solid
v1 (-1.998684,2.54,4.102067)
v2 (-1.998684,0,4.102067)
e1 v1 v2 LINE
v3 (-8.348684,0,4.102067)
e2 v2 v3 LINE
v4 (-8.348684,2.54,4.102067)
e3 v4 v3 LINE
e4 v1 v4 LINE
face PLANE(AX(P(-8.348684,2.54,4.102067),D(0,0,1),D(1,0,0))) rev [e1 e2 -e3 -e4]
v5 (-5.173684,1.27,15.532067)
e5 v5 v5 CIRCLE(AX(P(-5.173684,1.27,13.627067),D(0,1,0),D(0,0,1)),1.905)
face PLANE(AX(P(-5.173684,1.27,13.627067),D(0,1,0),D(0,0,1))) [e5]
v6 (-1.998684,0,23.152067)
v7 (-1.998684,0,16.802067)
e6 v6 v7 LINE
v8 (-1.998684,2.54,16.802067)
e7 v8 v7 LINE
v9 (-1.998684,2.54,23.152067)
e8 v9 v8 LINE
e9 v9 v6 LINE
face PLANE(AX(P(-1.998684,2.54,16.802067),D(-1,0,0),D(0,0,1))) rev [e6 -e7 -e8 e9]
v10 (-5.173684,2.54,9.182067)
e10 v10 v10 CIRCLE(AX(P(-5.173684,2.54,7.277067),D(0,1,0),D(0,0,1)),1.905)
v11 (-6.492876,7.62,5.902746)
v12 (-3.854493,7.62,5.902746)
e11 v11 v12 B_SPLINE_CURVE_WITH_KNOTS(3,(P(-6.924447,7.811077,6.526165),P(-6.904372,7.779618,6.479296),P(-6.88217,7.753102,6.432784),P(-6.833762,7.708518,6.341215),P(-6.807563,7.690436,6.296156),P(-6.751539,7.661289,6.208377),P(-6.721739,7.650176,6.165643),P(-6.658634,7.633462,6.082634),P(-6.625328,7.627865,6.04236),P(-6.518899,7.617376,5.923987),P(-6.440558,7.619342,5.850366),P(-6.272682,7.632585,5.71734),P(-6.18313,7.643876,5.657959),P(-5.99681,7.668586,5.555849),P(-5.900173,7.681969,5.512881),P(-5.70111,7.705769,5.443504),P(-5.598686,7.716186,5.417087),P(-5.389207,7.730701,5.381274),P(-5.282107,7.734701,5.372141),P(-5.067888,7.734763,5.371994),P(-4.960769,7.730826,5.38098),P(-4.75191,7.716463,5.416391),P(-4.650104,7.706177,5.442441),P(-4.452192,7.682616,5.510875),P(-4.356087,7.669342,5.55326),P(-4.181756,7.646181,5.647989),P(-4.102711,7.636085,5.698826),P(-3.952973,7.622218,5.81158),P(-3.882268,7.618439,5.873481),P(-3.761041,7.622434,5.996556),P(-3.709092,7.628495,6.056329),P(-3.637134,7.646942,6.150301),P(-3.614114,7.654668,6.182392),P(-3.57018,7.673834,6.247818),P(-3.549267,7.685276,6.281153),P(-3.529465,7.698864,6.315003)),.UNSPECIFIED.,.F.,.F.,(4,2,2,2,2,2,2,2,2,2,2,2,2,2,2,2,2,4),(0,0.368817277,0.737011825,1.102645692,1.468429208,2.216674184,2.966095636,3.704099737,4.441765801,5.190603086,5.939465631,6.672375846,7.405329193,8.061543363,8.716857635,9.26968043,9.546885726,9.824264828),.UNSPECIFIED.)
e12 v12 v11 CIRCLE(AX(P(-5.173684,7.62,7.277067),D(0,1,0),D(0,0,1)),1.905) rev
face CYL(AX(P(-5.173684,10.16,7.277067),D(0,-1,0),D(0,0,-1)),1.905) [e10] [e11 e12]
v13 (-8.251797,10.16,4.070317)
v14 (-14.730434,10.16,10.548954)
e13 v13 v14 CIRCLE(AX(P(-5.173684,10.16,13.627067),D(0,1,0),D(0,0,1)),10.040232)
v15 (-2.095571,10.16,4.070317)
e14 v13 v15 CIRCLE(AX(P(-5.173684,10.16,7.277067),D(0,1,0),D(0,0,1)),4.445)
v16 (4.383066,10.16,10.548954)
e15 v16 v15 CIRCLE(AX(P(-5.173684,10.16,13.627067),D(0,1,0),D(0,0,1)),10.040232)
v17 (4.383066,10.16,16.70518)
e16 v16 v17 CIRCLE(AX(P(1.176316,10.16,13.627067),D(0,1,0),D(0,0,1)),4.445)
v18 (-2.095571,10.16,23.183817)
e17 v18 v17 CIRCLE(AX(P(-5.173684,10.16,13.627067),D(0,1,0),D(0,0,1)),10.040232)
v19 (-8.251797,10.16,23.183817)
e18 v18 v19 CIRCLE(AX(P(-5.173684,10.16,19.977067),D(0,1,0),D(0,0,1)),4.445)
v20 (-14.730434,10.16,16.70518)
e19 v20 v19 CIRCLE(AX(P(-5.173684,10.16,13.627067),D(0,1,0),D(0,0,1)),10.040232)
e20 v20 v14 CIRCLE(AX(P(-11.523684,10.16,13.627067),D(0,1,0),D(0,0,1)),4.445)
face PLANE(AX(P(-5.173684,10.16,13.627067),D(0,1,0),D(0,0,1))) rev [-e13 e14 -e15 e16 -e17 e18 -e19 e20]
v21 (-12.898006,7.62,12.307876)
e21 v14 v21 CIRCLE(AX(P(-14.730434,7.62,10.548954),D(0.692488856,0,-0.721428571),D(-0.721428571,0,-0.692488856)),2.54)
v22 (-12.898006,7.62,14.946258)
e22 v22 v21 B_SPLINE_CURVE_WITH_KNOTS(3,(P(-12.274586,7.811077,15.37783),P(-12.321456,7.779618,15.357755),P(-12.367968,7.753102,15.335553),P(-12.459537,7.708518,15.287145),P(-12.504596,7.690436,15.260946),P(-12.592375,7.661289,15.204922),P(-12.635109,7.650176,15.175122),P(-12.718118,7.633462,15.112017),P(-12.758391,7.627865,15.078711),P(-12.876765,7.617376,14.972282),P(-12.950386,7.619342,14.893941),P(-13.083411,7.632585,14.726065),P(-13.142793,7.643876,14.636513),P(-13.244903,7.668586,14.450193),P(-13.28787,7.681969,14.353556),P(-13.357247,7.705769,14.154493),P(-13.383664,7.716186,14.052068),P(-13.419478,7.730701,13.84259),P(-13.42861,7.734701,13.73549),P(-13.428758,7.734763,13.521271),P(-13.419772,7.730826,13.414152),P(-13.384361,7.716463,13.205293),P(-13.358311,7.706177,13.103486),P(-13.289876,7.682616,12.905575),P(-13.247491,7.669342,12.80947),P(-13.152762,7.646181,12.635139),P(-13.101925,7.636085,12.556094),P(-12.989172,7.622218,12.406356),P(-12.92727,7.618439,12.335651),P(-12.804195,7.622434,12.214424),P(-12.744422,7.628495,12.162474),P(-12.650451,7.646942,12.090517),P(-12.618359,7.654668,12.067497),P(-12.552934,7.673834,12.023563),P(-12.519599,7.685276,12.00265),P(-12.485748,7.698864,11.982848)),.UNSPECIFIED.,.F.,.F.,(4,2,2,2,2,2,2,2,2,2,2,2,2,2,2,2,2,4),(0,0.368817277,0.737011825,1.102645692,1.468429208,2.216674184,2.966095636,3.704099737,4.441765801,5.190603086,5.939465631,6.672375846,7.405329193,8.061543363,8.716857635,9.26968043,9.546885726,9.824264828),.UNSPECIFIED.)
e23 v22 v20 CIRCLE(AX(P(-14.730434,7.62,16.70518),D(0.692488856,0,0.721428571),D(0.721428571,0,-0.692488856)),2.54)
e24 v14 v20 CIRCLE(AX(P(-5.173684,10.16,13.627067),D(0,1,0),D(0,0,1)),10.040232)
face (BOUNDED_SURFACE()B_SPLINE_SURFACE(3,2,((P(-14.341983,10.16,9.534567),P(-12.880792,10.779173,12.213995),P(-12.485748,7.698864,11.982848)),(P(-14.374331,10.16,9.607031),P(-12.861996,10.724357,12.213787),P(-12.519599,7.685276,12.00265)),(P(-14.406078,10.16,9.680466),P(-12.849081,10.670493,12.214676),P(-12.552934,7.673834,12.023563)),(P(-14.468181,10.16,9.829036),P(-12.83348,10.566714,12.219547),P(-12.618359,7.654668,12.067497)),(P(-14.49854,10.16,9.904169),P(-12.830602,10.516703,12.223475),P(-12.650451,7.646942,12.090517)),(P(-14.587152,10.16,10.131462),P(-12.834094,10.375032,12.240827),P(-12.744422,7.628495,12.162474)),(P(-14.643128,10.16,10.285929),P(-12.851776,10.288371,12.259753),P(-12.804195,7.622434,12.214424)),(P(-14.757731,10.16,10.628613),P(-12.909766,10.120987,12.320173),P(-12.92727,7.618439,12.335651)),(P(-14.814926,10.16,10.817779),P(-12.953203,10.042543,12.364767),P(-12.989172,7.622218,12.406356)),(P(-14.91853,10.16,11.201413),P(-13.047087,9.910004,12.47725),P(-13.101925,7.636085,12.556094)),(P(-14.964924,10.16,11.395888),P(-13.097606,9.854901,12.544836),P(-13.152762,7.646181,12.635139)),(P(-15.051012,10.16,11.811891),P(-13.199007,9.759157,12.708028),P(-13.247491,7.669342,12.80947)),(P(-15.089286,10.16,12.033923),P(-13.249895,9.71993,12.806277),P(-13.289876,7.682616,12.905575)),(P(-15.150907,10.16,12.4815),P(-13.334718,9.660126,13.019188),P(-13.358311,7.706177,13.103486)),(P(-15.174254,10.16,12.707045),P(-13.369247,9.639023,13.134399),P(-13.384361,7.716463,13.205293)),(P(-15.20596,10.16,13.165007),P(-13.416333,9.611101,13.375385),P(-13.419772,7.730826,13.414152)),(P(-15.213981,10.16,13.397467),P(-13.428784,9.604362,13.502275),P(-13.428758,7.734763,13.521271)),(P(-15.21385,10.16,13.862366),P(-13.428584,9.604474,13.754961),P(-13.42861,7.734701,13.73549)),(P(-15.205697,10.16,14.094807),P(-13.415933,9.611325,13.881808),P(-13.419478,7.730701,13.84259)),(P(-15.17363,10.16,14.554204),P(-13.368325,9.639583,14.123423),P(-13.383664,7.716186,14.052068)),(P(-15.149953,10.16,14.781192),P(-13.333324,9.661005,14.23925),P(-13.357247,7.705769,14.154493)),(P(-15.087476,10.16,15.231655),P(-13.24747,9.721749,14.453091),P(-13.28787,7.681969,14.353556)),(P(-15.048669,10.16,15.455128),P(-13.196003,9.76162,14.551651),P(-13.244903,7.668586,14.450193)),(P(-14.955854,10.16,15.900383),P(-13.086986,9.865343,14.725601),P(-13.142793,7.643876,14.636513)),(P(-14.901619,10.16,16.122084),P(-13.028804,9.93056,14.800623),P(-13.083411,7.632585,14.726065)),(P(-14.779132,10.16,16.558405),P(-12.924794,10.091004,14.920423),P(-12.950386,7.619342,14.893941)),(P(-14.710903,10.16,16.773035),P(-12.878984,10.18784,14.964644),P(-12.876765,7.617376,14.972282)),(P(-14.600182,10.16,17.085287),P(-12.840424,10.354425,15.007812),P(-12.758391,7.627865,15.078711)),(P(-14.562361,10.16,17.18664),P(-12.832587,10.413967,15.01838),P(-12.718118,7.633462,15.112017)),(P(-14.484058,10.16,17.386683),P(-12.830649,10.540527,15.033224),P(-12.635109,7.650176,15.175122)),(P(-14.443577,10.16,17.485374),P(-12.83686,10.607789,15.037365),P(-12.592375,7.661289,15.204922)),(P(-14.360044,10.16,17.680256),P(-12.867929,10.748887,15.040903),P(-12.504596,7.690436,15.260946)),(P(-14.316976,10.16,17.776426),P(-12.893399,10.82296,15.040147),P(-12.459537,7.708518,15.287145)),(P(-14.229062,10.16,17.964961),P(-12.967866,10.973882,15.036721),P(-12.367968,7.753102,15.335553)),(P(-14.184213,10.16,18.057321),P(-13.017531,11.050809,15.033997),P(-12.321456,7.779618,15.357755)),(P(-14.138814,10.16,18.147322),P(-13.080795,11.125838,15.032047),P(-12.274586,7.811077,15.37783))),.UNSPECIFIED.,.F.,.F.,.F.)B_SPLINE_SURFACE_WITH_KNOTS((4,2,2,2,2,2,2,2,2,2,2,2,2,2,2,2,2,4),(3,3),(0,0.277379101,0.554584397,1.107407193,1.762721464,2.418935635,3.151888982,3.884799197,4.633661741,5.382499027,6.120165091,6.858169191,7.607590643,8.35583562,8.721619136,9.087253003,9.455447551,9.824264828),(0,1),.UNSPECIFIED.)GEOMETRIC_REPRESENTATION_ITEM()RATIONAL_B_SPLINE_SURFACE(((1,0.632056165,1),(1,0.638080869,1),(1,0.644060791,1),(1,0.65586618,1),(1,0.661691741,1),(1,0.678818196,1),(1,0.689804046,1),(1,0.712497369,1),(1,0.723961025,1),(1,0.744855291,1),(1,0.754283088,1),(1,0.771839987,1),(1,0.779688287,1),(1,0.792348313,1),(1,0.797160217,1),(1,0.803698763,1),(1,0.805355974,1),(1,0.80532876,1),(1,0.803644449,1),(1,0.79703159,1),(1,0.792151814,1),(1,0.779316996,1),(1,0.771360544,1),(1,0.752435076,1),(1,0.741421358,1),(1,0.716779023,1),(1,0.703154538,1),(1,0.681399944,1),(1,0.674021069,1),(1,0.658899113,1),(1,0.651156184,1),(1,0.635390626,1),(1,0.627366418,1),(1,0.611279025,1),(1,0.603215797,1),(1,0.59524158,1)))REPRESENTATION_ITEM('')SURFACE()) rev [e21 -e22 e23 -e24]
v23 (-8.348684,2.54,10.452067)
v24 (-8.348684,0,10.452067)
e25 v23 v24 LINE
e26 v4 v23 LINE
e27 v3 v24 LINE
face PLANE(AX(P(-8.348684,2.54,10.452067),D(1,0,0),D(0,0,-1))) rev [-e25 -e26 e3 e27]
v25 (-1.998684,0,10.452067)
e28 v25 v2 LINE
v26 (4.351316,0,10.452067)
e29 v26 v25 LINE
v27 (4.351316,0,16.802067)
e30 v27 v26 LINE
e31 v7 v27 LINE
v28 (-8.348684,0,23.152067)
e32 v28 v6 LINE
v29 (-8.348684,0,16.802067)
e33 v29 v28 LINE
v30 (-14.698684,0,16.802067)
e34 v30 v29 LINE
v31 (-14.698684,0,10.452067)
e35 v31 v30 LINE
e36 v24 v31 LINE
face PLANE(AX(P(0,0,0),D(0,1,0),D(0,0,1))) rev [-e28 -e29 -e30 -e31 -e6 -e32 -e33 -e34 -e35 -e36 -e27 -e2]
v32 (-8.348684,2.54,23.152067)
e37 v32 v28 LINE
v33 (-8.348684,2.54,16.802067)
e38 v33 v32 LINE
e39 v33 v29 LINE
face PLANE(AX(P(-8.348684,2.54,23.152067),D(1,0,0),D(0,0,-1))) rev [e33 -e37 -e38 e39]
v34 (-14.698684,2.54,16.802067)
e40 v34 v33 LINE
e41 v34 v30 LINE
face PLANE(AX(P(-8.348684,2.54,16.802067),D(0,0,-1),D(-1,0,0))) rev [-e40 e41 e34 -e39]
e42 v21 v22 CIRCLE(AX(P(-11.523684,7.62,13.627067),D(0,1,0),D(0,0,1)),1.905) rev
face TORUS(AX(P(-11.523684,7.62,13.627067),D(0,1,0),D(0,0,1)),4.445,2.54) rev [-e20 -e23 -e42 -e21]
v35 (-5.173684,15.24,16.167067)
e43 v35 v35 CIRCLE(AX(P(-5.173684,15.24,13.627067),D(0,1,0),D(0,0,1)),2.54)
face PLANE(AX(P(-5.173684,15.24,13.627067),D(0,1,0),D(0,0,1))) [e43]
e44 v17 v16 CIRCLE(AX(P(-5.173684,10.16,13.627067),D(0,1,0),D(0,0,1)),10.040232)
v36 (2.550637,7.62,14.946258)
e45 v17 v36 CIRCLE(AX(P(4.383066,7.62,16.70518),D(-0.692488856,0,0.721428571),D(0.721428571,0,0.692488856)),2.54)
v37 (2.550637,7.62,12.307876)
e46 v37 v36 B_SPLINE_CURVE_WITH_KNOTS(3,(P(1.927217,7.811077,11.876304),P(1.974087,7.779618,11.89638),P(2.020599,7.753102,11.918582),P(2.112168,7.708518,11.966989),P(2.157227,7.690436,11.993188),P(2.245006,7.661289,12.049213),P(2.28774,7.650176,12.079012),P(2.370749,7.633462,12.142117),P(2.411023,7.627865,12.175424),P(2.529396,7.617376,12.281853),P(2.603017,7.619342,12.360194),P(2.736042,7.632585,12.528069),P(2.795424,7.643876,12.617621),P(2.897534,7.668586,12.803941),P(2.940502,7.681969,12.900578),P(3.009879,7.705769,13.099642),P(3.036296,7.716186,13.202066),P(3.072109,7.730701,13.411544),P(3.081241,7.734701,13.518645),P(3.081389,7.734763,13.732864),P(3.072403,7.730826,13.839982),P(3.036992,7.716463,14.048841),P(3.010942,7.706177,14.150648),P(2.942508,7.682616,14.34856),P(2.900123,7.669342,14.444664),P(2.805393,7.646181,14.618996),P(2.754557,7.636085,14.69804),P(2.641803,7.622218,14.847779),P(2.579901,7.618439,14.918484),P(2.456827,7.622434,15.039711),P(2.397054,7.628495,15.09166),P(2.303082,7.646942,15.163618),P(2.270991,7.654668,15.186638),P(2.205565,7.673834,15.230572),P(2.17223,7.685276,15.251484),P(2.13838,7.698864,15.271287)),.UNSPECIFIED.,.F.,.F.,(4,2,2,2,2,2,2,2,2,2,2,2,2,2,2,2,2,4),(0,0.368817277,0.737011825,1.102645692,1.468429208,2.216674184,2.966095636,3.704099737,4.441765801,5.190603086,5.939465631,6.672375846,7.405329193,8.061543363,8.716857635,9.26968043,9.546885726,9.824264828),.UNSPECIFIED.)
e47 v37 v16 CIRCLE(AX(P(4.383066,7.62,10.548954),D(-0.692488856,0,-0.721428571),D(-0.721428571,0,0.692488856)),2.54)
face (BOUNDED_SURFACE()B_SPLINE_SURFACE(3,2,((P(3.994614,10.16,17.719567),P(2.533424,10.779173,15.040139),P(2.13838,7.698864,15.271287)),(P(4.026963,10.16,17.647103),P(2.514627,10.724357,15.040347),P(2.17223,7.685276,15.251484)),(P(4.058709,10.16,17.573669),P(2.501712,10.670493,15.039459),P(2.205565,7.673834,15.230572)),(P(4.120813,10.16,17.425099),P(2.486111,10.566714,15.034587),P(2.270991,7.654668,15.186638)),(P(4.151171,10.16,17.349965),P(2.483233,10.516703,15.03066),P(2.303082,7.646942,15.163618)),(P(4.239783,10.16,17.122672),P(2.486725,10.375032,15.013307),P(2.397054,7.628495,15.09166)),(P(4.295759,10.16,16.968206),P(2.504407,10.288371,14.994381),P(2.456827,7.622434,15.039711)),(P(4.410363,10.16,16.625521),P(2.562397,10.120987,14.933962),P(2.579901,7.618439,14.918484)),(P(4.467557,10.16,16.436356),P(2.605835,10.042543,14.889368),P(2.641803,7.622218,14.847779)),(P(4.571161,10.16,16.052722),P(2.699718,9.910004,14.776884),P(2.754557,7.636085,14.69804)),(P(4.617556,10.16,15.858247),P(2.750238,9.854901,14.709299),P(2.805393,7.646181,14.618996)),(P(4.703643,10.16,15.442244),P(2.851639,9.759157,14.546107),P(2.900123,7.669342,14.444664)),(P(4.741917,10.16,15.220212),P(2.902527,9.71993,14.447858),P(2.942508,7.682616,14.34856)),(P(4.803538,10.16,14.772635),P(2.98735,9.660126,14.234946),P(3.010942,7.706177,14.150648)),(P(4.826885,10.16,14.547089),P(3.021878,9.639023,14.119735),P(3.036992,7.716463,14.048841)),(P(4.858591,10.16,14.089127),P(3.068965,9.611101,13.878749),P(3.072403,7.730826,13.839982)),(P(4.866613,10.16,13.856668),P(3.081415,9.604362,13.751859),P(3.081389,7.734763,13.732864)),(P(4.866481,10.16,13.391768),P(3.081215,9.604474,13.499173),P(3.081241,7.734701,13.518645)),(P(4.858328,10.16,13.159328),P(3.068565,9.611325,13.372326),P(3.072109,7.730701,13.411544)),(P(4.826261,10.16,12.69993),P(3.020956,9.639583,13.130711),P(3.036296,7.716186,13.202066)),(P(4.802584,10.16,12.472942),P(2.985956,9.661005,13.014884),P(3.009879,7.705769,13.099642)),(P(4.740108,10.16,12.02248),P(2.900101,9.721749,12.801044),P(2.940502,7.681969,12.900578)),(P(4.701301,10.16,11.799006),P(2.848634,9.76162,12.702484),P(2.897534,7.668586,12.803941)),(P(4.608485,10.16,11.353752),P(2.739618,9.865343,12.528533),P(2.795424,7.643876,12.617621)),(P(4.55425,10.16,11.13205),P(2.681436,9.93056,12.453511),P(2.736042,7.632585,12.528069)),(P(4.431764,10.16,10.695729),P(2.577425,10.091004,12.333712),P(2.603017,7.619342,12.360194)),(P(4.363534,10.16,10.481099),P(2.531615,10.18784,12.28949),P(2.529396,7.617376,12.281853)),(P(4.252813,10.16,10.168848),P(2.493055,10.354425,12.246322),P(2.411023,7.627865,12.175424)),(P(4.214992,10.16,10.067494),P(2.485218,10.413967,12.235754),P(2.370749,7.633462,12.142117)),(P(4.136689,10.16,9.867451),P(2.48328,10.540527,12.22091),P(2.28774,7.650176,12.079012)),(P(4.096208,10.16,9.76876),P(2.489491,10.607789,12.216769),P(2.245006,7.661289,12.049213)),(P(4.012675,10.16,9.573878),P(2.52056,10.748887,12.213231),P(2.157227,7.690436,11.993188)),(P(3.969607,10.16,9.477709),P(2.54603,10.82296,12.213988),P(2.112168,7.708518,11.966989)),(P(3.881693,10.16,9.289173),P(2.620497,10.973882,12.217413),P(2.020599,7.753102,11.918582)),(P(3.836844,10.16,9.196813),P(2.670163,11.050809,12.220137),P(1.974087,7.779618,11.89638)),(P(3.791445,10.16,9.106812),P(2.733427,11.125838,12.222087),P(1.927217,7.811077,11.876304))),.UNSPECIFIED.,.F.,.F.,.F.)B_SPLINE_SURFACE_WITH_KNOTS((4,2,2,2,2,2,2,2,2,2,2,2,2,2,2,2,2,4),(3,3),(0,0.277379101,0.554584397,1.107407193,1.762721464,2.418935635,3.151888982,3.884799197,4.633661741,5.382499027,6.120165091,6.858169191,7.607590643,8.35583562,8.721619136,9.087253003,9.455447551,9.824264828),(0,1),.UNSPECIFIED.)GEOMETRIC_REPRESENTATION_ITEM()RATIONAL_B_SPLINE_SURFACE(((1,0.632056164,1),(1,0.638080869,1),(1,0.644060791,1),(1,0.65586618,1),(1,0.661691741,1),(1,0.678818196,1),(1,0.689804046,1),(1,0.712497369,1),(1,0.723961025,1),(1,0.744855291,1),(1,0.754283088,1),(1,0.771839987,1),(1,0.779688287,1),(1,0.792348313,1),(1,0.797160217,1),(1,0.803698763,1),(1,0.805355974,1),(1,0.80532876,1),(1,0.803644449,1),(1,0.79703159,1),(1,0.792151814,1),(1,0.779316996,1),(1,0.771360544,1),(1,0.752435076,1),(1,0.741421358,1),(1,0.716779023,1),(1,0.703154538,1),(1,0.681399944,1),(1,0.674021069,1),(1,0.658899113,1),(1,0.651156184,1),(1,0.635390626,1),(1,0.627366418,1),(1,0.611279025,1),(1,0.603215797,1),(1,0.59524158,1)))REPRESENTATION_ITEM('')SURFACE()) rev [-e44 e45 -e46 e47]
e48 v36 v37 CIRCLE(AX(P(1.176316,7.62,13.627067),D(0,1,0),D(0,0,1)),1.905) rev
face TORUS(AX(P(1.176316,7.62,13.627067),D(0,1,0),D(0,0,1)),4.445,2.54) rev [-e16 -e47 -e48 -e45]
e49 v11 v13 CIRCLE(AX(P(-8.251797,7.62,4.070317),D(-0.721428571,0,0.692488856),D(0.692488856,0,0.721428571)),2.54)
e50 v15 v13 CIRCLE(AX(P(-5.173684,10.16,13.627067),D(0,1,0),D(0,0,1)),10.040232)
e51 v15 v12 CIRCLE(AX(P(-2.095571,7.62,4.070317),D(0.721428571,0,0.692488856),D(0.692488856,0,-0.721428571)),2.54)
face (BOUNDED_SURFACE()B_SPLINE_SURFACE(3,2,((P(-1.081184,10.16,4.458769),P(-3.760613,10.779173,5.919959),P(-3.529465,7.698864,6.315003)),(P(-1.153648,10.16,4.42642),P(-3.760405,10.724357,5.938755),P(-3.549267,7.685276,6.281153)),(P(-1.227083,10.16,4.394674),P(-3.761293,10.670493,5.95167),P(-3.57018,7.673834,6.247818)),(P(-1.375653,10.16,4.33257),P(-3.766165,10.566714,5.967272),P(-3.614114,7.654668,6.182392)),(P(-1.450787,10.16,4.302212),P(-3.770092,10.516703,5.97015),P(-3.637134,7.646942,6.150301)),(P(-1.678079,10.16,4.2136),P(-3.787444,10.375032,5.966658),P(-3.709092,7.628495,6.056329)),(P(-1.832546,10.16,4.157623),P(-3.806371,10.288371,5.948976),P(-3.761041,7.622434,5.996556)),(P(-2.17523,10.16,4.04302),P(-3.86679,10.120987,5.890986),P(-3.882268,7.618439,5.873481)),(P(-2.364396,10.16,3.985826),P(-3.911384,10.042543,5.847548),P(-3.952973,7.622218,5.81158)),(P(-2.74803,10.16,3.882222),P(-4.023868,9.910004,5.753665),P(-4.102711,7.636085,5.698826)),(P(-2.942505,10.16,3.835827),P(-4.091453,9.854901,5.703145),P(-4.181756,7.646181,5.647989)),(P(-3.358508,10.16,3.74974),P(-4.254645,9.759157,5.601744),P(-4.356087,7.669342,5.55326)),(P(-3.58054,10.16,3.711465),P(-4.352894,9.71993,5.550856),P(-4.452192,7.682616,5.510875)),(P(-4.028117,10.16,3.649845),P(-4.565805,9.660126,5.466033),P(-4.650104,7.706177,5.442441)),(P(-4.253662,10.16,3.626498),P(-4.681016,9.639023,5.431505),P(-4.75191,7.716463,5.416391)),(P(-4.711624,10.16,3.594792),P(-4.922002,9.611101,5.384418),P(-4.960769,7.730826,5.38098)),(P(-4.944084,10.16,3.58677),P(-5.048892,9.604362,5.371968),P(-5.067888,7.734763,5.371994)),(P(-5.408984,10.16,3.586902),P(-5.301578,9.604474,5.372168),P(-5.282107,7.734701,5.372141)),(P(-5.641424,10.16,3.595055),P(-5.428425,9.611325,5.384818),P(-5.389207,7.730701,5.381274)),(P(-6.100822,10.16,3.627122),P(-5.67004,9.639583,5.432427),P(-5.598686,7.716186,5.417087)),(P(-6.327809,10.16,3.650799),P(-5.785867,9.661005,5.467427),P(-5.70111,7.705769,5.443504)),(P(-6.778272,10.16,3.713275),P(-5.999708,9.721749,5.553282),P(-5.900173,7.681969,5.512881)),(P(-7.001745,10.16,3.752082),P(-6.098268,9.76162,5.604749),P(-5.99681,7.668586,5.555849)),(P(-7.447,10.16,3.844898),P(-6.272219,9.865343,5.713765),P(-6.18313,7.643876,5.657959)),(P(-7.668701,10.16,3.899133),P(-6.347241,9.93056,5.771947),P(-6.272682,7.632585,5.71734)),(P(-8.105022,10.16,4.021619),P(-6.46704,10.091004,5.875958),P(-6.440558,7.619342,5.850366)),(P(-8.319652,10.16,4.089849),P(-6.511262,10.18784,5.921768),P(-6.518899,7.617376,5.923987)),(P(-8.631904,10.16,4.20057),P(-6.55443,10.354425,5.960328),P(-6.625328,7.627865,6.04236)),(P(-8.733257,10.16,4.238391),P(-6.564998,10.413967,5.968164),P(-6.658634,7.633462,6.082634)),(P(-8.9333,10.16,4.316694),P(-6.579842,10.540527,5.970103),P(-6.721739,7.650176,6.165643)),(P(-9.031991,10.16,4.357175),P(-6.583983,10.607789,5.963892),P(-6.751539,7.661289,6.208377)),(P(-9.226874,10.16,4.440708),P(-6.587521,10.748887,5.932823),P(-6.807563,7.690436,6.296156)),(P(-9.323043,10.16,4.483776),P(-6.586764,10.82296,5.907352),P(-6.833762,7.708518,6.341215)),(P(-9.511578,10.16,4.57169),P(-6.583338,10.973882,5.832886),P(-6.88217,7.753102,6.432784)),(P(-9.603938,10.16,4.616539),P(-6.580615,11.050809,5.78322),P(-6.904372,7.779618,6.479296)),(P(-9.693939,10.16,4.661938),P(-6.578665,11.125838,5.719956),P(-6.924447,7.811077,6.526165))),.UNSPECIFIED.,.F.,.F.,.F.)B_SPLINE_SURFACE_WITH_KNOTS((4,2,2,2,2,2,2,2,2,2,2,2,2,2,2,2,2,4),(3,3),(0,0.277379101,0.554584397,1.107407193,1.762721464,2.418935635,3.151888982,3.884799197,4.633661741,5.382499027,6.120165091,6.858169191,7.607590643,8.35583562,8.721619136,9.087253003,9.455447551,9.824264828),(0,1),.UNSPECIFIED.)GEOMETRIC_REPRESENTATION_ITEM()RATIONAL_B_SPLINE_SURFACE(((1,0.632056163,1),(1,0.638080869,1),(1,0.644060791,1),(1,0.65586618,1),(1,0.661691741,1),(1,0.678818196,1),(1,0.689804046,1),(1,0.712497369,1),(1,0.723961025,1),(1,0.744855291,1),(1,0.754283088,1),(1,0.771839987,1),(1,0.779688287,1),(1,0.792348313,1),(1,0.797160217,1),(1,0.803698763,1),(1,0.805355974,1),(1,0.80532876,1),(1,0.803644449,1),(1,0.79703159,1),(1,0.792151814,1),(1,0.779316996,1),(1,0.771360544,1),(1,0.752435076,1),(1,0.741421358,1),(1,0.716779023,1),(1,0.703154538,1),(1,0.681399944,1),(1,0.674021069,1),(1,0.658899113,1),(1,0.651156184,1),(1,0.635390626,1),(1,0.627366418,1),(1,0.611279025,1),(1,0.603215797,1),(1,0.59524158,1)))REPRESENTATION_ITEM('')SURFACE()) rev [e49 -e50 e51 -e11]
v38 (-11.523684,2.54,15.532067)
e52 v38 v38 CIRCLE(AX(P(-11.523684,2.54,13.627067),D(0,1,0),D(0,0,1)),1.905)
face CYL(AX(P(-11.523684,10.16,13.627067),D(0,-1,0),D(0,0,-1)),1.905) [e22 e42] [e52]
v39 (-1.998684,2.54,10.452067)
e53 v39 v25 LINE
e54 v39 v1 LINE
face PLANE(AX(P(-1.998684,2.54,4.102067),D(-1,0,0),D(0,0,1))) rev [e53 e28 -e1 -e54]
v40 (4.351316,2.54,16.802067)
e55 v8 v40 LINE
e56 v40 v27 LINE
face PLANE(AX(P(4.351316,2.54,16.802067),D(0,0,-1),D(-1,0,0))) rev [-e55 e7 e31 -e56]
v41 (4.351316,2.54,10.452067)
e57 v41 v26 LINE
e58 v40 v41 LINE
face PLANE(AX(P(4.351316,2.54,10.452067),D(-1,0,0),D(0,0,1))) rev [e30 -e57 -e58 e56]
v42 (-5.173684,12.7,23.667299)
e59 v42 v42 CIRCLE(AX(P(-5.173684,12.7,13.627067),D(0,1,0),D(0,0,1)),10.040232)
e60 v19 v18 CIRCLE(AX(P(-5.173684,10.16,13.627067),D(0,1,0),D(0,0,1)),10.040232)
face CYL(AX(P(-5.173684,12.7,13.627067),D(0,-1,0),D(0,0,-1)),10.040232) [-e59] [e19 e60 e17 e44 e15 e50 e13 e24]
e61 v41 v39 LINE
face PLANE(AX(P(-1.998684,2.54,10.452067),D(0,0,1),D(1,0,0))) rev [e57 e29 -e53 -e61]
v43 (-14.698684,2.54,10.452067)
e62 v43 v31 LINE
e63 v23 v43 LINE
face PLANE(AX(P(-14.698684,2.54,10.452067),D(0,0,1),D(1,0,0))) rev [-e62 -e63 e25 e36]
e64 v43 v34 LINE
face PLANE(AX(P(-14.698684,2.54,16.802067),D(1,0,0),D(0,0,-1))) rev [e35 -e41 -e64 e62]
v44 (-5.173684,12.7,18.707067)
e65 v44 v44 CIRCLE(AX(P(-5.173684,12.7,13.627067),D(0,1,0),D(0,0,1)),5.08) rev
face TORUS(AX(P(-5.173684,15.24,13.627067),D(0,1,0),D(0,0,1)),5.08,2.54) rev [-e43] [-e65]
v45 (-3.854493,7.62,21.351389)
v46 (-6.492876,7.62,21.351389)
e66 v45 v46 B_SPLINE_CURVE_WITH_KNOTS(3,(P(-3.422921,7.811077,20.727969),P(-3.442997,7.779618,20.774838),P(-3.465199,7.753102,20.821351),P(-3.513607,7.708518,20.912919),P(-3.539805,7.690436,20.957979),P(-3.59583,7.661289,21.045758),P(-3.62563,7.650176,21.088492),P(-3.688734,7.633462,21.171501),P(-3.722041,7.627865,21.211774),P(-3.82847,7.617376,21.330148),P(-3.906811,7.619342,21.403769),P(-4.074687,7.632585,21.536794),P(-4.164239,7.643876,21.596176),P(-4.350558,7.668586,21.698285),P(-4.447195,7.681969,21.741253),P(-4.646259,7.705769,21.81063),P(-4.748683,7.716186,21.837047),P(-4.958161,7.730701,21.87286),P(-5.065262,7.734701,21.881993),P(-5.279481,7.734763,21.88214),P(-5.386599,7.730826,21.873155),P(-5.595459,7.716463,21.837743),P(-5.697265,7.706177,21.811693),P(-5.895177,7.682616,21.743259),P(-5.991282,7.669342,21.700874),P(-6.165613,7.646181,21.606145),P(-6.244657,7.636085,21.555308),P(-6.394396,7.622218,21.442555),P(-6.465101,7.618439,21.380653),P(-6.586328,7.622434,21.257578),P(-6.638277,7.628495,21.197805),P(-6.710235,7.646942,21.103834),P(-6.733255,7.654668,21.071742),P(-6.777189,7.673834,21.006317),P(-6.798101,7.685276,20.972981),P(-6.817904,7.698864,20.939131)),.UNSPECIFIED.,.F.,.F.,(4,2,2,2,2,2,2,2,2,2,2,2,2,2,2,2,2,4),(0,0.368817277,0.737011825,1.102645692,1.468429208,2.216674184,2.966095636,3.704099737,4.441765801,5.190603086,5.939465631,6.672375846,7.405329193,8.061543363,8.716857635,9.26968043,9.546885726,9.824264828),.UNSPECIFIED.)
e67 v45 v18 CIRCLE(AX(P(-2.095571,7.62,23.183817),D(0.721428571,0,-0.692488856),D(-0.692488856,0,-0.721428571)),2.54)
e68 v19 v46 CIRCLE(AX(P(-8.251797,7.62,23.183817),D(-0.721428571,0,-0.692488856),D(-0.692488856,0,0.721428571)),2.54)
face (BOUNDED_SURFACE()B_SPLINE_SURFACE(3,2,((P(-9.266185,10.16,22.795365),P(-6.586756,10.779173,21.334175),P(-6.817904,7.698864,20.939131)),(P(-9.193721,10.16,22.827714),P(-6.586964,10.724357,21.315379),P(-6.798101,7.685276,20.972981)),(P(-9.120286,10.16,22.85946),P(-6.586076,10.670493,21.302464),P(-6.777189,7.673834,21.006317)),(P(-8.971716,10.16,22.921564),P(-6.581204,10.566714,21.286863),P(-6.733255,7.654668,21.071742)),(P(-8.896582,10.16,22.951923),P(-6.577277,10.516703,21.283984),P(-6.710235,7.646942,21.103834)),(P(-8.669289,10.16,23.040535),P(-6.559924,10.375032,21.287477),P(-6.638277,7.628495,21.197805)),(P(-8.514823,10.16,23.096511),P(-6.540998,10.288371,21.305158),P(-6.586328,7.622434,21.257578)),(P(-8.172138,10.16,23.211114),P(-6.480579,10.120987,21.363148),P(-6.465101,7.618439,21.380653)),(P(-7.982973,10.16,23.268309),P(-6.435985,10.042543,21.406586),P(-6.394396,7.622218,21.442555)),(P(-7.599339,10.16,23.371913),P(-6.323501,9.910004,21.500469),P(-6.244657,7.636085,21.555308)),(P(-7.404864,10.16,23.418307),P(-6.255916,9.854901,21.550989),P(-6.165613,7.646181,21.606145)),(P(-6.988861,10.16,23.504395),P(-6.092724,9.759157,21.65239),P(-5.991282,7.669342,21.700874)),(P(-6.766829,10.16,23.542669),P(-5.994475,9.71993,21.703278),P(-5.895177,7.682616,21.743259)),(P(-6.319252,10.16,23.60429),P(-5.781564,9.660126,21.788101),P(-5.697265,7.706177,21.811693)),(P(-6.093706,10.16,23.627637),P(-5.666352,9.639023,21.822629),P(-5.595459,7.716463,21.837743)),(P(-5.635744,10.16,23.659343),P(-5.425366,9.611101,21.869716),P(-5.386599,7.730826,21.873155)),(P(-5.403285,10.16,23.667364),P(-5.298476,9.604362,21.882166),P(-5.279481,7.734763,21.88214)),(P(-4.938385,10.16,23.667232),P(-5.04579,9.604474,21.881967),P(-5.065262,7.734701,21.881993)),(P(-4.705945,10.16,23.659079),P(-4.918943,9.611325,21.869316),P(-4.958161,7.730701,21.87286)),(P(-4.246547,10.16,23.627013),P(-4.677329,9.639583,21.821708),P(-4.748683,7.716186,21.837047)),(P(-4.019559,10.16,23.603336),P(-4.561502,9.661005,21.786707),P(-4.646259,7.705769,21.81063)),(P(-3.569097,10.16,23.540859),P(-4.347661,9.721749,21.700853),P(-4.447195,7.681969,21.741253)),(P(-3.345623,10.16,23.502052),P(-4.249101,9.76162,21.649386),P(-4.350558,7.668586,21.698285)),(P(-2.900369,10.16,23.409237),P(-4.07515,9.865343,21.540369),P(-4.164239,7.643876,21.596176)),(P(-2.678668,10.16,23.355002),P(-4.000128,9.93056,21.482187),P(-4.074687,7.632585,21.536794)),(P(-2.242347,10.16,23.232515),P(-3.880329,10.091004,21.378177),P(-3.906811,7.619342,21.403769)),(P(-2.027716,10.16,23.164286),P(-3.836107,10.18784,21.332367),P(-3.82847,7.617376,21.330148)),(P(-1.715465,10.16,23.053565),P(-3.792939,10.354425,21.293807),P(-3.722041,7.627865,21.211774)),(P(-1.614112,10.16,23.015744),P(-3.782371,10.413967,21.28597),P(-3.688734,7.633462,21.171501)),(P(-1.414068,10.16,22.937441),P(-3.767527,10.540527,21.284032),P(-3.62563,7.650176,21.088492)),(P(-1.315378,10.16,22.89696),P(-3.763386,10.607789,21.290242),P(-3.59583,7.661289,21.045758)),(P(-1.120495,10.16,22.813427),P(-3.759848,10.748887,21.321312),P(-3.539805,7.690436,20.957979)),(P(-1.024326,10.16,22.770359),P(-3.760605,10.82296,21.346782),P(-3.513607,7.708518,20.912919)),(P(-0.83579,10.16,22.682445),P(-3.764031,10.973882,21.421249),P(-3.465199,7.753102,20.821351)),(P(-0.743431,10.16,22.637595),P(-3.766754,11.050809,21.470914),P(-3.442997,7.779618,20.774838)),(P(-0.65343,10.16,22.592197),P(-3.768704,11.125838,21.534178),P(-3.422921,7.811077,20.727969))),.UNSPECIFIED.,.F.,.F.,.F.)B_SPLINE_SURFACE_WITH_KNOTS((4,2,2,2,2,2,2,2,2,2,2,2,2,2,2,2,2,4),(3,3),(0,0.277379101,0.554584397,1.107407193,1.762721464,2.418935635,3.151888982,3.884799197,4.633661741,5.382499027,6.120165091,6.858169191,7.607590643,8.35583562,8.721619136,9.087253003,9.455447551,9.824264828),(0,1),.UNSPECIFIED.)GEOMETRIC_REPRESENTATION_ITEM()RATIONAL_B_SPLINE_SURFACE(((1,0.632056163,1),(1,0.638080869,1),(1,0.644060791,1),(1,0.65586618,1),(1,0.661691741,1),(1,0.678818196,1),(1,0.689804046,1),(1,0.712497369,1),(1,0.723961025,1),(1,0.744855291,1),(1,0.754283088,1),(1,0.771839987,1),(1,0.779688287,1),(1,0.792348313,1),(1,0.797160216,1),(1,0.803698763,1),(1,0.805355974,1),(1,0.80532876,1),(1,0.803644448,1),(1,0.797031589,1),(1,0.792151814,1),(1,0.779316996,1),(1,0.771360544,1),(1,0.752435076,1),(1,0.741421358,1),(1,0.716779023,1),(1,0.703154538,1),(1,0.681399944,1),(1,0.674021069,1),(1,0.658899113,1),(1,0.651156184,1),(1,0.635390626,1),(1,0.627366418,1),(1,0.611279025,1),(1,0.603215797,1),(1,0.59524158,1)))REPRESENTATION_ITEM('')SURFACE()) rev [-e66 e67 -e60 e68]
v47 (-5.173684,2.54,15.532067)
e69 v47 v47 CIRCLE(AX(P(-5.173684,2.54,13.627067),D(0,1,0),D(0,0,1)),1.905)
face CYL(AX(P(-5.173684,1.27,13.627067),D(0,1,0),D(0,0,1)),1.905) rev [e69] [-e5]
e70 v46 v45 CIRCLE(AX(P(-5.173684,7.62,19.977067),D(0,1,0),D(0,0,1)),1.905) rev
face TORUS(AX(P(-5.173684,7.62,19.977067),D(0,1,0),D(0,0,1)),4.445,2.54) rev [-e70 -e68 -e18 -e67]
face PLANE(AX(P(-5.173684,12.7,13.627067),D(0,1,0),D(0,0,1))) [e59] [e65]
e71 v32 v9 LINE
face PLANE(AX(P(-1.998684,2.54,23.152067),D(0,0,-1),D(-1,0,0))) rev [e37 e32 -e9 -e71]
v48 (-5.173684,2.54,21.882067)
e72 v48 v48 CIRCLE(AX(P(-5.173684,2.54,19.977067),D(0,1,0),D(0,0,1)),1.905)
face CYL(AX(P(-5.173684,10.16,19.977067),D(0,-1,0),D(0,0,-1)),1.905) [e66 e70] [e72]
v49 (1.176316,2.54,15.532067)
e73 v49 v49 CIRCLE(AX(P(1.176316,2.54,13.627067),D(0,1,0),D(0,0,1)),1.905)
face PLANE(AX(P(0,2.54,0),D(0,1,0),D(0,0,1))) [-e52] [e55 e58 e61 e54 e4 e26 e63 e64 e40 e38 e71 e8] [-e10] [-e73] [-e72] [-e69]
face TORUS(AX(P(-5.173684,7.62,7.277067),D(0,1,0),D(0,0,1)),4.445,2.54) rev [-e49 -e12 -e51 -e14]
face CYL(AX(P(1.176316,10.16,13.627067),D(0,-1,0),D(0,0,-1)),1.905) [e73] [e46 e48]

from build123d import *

# Parameters (mm, degrees)
BODY_DEPTH        = 2.54
SKETCH2_R         = 1.905
LEGS_DEPTH        = 7.62
SKETCH4_R         = 1.905
SPRING_HOLE_DEPTH = 1.27
SKETCH5_R         = 10.040231571
FOOT_DEPTH        = 2.54
SKETCH6_R         = 2.54
FLAG_DEPTH        = 2.54
ROUNDITY_R        = 2.54


with BuildPart() as part:
    # Sketch1 → body (new body)
    with BuildSketch(Plane(origin=(0, 0, 0), x_dir=(1, 0, 0), z_dir=(0, 1, 0))):
        Polygon((-8.348684361, -10.452067183), (-8.348684361, -4.102067183), (-1.998684361, -4.102067183), (-1.998684361, -10.452067183), (4.351315639, -10.452067183), (4.351315639, -16.802067183), (-1.998684361, -16.802067183), (-1.998684361, -23.152067183), (-8.348684361, -23.152067183), (-8.348684361, -16.802067183), (-14.698684361, -16.802067183), (-14.698684361, -10.452067183), align=None)
    extrude(amount=BODY_DEPTH)

    # Sketch2 → legs (add)
    with BuildSketch(Plane(origin=(0, 2.54, 0), x_dir=(1, 0, 0), z_dir=(0, 1, 0))):
        with Locations(Location((-5.173684361, -7.277067183, 0), (0, 0, 90))):
            Circle(SKETCH2_R)
        with Locations(Location((1.176315639, -13.627067183, 0), (0, 0, 90))):
            Circle(SKETCH2_R)
        with Locations(Location((-5.173684361, -19.977067183, 0), (0, 0, 90))):
            Circle(SKETCH2_R)
        with Locations(Location((-11.523684361, -13.627067183, 0), (0, 0, 90))):
            Circle(SKETCH2_R)
    extrude(amount=LEGS_DEPTH)

    # Sketch4 → spring hole (cut)
    with BuildSketch(Plane(origin=(0, 2.54, 0), x_dir=(1, 0, 0), z_dir=(0, 1, 0))):
        with Locations(Location((-5.173684361, -13.627067183, 0), (0, 0, 270))):
            Circle(SKETCH4_R)
    extrude(amount=-SPRING_HOLE_DEPTH, mode=Mode.SUBTRACT)

    # Sketch5 → foot (add)
    with BuildSketch(Plane(origin=(0, 10.16, 0), x_dir=(1, 0, 0), z_dir=(0, 1, 0))):
        with Locations(Location((-5.173684361, -13.627067183, 0), (0, 0, 270))):
            Circle(SKETCH5_R)
    extrude(amount=FOOT_DEPTH)

    # Sketch6 → flag (add)
    with BuildSketch(Plane(origin=(0, 12.7, 0), x_dir=(1, 0, 0), z_dir=(0, 1, 0))):
        with Locations(Location((-5.173684361, -13.627067183, 0), (0, 0, 270))):
            Circle(SKETCH6_R)
    extrude(amount=FLAG_DEPTH)

    # roundity
    roundity_edges = [part.edges().sort_by_distance(p)[0] for p in [
        (-5.173684361, 10.16, 9.182067183),
        (1.176315639, 10.16, 15.532067183),
        (-5.173684361, 10.16, 21.882067183),
        (-11.523684361, 10.16, 15.532067183),
        (-5.173684361, 12.7, 11.087067183),
    ]]
    fillet(roundity_edges, radius=ROUNDITY_R - 0.0001)  # a hair under: the kernel refuses the full size


solid = part.part
